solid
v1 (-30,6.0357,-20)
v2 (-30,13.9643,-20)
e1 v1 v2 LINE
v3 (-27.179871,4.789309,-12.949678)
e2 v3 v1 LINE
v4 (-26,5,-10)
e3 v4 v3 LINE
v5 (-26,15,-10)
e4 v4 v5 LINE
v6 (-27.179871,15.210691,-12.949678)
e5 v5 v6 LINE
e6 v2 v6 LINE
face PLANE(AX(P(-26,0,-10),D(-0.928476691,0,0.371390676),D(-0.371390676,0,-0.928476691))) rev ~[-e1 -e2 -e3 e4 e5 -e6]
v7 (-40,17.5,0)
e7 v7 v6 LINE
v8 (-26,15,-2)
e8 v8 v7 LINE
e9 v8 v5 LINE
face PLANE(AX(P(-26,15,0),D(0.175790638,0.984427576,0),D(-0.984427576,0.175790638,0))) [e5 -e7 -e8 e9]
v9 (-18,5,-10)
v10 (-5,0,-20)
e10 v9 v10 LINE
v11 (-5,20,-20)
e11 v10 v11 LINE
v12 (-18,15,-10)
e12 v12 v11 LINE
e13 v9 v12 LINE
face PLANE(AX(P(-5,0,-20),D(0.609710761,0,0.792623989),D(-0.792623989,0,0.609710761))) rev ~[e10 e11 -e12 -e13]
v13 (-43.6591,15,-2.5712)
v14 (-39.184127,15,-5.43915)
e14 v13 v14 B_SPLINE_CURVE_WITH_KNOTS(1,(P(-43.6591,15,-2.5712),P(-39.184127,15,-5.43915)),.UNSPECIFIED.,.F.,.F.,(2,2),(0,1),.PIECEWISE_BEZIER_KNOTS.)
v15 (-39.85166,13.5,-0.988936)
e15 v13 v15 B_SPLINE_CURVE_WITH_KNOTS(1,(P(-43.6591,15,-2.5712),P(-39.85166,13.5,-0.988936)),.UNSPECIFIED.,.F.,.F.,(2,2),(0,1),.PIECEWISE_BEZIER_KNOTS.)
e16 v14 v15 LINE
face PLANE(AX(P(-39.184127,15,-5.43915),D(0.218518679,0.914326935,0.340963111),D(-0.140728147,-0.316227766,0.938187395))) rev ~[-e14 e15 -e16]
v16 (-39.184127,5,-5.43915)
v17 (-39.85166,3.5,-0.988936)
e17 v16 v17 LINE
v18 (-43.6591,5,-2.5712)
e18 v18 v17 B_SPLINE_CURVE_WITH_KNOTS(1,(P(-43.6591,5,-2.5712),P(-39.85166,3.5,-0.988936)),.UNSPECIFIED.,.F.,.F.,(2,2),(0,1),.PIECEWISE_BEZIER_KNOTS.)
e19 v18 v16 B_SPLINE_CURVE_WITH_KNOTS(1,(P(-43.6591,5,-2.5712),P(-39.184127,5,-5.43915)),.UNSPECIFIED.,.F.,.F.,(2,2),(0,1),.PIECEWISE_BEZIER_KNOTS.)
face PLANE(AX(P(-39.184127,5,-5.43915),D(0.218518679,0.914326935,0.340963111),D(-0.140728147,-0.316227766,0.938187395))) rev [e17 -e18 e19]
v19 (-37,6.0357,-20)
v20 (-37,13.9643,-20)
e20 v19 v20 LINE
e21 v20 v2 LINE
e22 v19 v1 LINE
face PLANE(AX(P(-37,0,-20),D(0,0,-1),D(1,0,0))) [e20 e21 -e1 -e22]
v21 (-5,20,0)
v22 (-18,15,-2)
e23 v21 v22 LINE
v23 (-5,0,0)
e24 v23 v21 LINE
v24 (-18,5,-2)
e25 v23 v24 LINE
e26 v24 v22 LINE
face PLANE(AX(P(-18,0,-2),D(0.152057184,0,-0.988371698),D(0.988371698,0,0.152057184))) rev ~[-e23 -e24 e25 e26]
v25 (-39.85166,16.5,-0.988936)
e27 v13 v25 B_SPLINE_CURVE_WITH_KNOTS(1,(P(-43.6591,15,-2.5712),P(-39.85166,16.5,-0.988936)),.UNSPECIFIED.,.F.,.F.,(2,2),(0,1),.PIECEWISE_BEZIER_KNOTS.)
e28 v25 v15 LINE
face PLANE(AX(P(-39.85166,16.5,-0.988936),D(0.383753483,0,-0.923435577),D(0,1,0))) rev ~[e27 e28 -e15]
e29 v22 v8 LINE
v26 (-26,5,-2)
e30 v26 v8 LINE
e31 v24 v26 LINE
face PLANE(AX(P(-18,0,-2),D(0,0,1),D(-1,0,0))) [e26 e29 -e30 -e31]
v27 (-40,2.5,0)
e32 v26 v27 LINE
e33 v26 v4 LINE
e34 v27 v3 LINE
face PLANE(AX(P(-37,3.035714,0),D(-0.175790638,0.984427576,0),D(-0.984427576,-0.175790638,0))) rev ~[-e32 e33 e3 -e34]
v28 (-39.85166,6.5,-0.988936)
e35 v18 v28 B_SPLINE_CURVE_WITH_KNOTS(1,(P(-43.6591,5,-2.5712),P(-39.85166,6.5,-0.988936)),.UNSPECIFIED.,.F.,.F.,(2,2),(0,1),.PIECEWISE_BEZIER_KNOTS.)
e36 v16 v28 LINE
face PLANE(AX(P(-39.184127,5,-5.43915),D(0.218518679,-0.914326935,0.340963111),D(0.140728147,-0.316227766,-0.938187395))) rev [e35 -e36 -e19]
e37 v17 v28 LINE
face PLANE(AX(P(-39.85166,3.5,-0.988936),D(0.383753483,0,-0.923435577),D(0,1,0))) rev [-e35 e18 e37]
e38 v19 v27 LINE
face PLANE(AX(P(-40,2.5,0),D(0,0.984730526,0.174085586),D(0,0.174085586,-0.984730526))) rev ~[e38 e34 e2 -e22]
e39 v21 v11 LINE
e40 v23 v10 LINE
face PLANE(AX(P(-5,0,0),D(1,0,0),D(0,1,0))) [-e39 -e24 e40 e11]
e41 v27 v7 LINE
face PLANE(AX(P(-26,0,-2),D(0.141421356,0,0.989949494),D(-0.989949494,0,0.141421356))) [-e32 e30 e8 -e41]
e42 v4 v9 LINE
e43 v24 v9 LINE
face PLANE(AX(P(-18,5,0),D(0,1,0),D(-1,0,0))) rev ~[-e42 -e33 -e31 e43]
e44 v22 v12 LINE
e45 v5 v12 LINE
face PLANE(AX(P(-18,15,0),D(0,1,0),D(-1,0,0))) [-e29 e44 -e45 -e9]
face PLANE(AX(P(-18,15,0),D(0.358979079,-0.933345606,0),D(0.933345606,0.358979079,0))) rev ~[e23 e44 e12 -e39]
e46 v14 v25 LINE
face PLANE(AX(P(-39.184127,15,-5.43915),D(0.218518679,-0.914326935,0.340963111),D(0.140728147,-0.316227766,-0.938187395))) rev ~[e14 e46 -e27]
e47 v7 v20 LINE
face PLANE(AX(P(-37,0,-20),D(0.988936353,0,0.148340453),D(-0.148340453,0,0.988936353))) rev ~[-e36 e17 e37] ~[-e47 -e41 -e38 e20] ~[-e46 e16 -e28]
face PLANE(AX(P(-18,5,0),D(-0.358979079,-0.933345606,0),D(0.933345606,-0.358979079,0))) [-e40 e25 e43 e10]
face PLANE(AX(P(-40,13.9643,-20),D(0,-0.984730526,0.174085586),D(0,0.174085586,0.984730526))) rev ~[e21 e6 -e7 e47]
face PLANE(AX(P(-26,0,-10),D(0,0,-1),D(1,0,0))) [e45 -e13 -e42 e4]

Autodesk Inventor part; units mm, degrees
sketch "Sketch1" plane through (0, 0, 0) normal (0, 1, 0) x (-1, 0, 0)
  line L0 (0, 0) -> (40, 0)
  line L1 (0, 0) -> (0, -20)
  line L2 (0, 0) -> (0, -10)
  line L3 (37, -20) -> (40, 0)
  line L4 (37, -20) -> (30, -20)
  line L5 (26, -10) -> (30, -20)
  line L6 (26, -10) -> (18, -10)
  line L7 (0, -20) -> (5, -20)
  line L8 (5, -20) -> (18, -10)
  line L9 (18, 0) -> (18, -2)
  line L10 (18, -2) -> (5, 0)
  line L11 (18, -2) -> (26, -2)
  line L12 (26, -2) -> (40, 0)
  dimension "d1" = 40
  dimension "d2" = 20
  dimension "d7" = 10
  dimension "d8" = 37
  dimension "d9" = 7
  dimension "d10" = 26
  dimension "d11" = 8
  dimension "d12" = 5
  dimension "d33" = 2
extrude "Extrusion1" add sketch "Sketch1" along normal blind 20 contours L0 L10 L11 L12 L3 L4 L5 L6 L8 L7 L1
sketch "Sketch2" plane through (-40, 0, 0) normal (0, 0, 1) x (1, 0, 0)
  line L0 (3, 0) -> (3, 20) projected
  line L1 (10, 0) -> (10, 20) projected
  line L2 (14, 0) -> (14, 20) projected
  line L3 (22, 0) -> (22, 20) projected
  line L4 (35, 0) -> (35, 20) projected
  line L5 (40, 0) -> (40, 20) projected
  line L6 (0, 0) -> (0, 20) projected
  line L7 (0, 20) -> (40, 20) projected
  line L8 (35, 0) -> (40, 0) projected
  line L9 (40, 0) -> (40, 20) projected
  line L10 (35, 20) -> (40, 20) projected
  line L11 (40, 0) -> (40, 20) projected
  line L12 (40, 10) -> (0, 10)
  line L13 (22, 0) -> (22, 5)
  line L14 (35, 0) -> (22, 0) projected
  line L15 (22, 5) -> (35, 0)
  line L16 (22, 5) -> (14, 5)
  line L17 (10, 0) -> (10, 2.5)
  line L18 (10, 2.5) -> (14, 5)
  line L19 (10, 2.5) -> (3, 2.5)
  line L20 (22, 15) -> (35, 20)
  line L21 (22, 15) -> (14, 15)
  line L22 (10, 17.5) -> (14, 15)
  line L23 (10, 17.5) -> (3, 17.5)
  line L24 (3, 17.5) -> (0, 17.5)
  line L25 (3, 2.5) -> (0, 2.5)
  line L26 (14, 5) -> (0, 2.5)
  line L27 (14, 15) -> (0, 17.5)
  line L28 (35, 0) -> (35, 20) projected
  line L29 (0, 0) -> (14, 0) projected
  line L30 (0, 0) -> (40, 0)
  dimension "d15" = 5
  dimension "d16" = 2.5
extrude "Extrusion2" cut sketch "Sketch2" against normal blind 20 contours L29 L6 L25 L0 | L0 L19 L1 L29 | L25 L26 L0 | L0 L26 L1 L19 | L1 L18 L2 L29 | L1 L26 L18 | L2 L16 L3 L30 | L3 L15 L14 | L27 L24 L0 | L0 L23 L1 L27 | L6 L7 L0 L24 | L4 L12 L5 L8 | L0 L7 L1 L23 | L1 L22 L27 | L22 L1 L7 L2 | L2 L7 L3 L21 | L4 L7 L5 L12 | L3 L7 L20
ref_plane "Work Plane1" through (-40, 0, 0) normal (1, 0, 0) x (0, 0, -1)
sketch "Sketch4" plane through (-40, 0, 0) normal (1, 0, 0) x (0, 0, -1)
  line L0 (0, 17.5) -> (20, 16.9643) projected
  line L1 (20, 3.0357) -> (20, 16.9643) projected
  line L2 (20, 3.0357) -> (0, 2.5) projected
  line L3 (20, 3.0357) -> (20, 16.9643) projected
  line L4 (20, 3.0357) -> (20, 6.0357)
  line L5 (20, 16.9643) -> (20, 13.9643)
  line L6 (20, 4.2857) -> (20, 15.7143) projected
  line L7 (0, 2.5) -> (0, 17.5) projected
  line L8 (0, 2.5) -> (20, 6.0357)
  line L9 (0, 17.5) -> (20, 16.9643) projected
  line L10 (20, 13.9643) -> (0, 17.5)
  point P0 (0, 0)
  dimension "d24" = 3
  dimension "d25" = 3
extrude "Extrusion4" cut sketch "Sketch4" along normal blind 22 contours L0 L1 L10 | L8 L1 L2
sketch "Sketch5" plane through (-40, 2.5, 0) normal (-0.9889364, 0, -0.1483405) x (-0.1483405, 0, 0.9889364)
  line L0 (0, 0) -> (0, 15) projected
  line L1 (0, 14) -> (-1, 14)
  line L2 (-4.0546, 12.5) -> (-11.9661, 12.5) projected
  line L3 (-5.5, 12.5) -> (-1, 14)
  line L4 (0, 11) -> (-1, 11)
  line L5 (-1, 14) -> (-1, 11)
  line L6 (-5.5, 12.5) -> (-1, 11)
  point P0 (-5.9336, -2.5)
  point P1 (-4.8339, 12.5)
  dimension "d53" = 1
  dimension "d55" = 1
ref_plane "Work Plane3" through (-43.9557, 2.5, -0.5934) normal (-0.9889364, 0, -0.1483405) x (-0.1483405, 0, 0.9889364)
sketch "Sketch8" plane through (-43.9557, 2.5, -0.5934) normal (-0.9889364, 0, -0.1483405) x (-0.1483405, 0, 0.9889364)
  line L0 (-5.5, 12.5) -> (-1, 14) projected
  line L1 (-1, 14) -> (-1, 11) projected
  line L2 (-5.5, 12.5) -> (-1, 11) projected
  line L3 (-1, 12.5) -> (-2, 12.5)
  point P0 (-5.9336, -2.5)
  dimension "d56" = 1
loft "Loft3" add profiles "Sketch5" section 1 point at (-43.6591, 15, -2.5712) contours L6 L3 L5
ref_plane "Work Plane4" through (-37, 10, -42.4242) normal (0, 1, 0) x (1, 0, 0)
mirror "Mirror1" about plane through (-37, 10, -42.4242) normal (0, 1, 0) of "Loft3"
properties part number "horse"
